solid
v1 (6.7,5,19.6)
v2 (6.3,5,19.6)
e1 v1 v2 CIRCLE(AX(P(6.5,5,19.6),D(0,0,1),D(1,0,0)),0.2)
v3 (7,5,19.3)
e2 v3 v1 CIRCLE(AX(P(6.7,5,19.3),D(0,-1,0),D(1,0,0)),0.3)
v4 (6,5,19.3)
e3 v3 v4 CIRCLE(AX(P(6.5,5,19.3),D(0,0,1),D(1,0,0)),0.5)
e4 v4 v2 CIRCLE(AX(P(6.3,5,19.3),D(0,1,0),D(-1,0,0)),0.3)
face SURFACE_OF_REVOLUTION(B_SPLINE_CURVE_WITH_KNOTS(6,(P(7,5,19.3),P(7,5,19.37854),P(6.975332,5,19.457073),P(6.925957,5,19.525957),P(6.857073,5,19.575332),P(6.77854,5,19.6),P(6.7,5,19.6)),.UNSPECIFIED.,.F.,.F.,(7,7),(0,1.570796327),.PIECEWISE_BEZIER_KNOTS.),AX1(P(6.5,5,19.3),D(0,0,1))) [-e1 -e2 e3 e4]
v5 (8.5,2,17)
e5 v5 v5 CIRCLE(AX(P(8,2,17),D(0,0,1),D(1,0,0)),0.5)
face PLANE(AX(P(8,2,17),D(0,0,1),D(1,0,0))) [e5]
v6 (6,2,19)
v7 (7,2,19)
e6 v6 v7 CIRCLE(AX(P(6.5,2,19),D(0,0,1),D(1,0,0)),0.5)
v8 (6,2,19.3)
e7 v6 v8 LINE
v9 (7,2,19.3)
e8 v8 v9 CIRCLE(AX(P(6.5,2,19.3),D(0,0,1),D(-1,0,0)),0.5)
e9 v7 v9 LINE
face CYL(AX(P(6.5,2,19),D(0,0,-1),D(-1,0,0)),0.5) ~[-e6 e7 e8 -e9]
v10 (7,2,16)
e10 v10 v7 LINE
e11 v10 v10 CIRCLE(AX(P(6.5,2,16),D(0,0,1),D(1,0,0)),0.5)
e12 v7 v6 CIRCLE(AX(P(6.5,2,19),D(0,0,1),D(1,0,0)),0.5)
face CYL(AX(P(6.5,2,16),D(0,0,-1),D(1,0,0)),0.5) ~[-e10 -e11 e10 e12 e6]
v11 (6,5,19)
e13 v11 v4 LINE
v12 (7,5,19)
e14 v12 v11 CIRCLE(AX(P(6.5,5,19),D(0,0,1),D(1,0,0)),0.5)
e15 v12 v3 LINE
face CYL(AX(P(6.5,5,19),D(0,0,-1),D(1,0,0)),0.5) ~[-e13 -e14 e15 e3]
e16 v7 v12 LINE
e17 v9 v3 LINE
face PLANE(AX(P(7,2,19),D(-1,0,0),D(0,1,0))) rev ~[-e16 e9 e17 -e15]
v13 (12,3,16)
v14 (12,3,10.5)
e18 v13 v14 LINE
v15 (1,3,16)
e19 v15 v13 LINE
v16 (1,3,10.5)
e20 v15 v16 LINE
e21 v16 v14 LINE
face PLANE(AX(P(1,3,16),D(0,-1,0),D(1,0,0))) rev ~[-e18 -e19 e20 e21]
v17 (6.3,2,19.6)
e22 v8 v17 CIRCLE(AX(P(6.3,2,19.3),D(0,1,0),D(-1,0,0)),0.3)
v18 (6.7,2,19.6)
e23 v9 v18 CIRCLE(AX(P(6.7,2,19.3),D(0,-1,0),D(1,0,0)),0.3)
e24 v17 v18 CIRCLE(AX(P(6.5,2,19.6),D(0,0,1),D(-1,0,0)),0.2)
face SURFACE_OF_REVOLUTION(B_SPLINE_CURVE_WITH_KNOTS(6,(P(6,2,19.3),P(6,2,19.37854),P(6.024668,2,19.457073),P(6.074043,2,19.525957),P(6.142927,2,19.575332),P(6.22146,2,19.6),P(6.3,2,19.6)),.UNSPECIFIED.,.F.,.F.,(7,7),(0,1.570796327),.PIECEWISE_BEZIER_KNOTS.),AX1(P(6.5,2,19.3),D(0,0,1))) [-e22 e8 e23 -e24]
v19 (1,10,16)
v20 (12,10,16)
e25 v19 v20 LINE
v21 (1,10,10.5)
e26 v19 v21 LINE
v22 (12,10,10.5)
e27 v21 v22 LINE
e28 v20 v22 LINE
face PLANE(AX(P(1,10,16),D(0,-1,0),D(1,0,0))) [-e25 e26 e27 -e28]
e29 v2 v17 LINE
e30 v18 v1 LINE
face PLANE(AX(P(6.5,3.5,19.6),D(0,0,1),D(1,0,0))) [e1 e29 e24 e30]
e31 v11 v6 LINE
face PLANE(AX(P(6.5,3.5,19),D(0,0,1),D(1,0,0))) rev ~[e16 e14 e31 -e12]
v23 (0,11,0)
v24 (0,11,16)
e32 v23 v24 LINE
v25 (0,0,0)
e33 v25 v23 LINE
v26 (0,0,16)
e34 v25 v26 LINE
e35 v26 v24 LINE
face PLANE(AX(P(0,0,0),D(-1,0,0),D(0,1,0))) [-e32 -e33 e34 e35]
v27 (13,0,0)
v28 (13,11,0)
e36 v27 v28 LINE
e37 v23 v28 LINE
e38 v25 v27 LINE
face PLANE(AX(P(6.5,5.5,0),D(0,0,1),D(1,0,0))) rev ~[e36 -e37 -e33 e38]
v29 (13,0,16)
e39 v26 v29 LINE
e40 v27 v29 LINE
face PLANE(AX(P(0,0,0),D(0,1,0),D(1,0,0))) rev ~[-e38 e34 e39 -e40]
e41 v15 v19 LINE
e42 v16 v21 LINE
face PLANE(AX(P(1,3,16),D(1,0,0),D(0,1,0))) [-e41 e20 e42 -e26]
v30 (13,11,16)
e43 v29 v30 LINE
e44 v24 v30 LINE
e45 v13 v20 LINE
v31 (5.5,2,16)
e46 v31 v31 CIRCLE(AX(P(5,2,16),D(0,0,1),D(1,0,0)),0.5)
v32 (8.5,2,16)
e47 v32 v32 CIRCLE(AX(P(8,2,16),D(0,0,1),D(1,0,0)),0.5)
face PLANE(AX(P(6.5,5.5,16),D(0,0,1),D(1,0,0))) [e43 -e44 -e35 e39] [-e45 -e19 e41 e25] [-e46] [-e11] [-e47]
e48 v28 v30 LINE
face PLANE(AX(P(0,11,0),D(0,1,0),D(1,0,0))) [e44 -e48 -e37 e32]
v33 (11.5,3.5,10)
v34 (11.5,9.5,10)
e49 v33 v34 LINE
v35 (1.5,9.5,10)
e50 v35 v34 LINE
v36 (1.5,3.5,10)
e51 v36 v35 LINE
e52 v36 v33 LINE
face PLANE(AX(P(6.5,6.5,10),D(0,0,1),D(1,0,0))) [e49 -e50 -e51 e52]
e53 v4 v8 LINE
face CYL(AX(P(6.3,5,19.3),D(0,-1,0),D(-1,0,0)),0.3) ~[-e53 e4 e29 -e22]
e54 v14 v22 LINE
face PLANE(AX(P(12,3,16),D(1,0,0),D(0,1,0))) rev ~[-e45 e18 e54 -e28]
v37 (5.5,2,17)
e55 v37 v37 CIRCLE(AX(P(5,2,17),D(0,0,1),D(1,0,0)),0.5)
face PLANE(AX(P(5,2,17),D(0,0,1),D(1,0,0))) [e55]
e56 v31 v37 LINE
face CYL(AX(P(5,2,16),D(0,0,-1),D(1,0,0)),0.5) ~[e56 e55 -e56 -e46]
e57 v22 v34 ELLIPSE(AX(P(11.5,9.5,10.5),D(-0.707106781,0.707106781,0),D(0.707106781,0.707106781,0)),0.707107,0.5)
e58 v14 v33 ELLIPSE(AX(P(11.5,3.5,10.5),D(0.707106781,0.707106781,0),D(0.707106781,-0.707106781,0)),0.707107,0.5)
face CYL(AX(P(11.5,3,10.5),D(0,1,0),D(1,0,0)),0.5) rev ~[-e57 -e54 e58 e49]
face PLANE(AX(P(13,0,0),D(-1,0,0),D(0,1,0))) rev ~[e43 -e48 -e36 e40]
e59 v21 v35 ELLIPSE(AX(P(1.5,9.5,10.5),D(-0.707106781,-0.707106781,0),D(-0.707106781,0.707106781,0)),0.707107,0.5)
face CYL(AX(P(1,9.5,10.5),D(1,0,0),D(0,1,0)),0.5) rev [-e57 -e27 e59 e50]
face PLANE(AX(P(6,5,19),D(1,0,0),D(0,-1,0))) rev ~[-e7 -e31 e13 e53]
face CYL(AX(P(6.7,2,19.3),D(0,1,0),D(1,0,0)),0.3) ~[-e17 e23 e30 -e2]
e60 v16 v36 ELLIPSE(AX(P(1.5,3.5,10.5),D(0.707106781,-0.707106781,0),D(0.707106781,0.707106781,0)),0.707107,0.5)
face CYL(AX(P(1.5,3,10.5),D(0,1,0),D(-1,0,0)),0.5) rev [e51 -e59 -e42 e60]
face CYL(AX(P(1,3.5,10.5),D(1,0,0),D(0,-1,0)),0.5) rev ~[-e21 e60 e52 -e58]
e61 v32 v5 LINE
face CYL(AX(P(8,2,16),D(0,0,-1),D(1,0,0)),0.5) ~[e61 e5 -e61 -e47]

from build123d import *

# Parameters (mm, degrees)
F0_W     = 13
F0_H     = 11
F1_DEPTH = 16
F2_W     = 11
F2_H     = 7
F3_DEPTH = 6
F4_R     = 0.5
F5_R     = 0.5
F6_DEPTH = 1
F7_DEPTH = 3
F9_DEPTH = 0.6
F10_R    = 0.3


# Not quite as in the source:
# - a feature names something its author has since deleted; it is built from what else it names


with BuildPart() as f1:
    # F0 (on Top) → F1 (new body)
    with BuildSketch(Plane.XY):
        with Locations((6.5, 5.5)):
            Rectangle(F0_W, F0_H)
    extrude(amount=F1_DEPTH)

    # F2 (on face) → F3 (cut)
    with BuildSketch(Plane.XY.offset(16)):
        with Locations((6.5, 6.5)):
            Rectangle(F2_W, F2_H)
    extrude(amount=-F3_DEPTH, mode=Mode.SUBTRACT)

    # F4
    f4_edges = [f1.edges().sort_by_distance(p)[0] for p in [
        (1, 6.5, 10),
        (6.5, 3, 10),
        (12, 6.5, 10),
        (6.5, 10, 10),
    ]]
    fillet(f4_edges, radius=F4_R)

    # F5 (on face) → F6 (join)
    with BuildSketch(Plane.XY.offset(16)):
        with Locations((5, 2)):
            Circle(F5_R)
        with Locations((8, 2)):
            Circle(F5_R)
    extrude(amount=F6_DEPTH)

    # F5 (on face) → F7 (join)
    with BuildSketch(Plane.XY.offset(16)):
        with Locations((6.5, 2)):
            Circle(F5_R)
    extrude(amount=F7_DEPTH)

    # F8 (on face) → F9 (join)
    with BuildSketch(Plane.XY.offset(19)):
        with BuildLine():
            Line((6, 5), (6, 2))
            ThreePointArc((6, 2), (6.5, 1.5), (7, 2))
            Line((7, 2), (7, 5))
            ThreePointArc((7, 5), (6.5, 5.5), (6, 5))
        make_face()
    extrude(amount=F9_DEPTH)

    # F10
    f10_edges = [f1.edges().sort_by_distance(p)[0] for p in [
        (6, 3.5, 19.6),
        (6.5, 1.5, 19.6),
        (7, 3.5, 19.6),
        (6.5, 5.5, 19.6),
    ]]
    fillet(f10_edges, radius=F10_R)


solid = f1.part
